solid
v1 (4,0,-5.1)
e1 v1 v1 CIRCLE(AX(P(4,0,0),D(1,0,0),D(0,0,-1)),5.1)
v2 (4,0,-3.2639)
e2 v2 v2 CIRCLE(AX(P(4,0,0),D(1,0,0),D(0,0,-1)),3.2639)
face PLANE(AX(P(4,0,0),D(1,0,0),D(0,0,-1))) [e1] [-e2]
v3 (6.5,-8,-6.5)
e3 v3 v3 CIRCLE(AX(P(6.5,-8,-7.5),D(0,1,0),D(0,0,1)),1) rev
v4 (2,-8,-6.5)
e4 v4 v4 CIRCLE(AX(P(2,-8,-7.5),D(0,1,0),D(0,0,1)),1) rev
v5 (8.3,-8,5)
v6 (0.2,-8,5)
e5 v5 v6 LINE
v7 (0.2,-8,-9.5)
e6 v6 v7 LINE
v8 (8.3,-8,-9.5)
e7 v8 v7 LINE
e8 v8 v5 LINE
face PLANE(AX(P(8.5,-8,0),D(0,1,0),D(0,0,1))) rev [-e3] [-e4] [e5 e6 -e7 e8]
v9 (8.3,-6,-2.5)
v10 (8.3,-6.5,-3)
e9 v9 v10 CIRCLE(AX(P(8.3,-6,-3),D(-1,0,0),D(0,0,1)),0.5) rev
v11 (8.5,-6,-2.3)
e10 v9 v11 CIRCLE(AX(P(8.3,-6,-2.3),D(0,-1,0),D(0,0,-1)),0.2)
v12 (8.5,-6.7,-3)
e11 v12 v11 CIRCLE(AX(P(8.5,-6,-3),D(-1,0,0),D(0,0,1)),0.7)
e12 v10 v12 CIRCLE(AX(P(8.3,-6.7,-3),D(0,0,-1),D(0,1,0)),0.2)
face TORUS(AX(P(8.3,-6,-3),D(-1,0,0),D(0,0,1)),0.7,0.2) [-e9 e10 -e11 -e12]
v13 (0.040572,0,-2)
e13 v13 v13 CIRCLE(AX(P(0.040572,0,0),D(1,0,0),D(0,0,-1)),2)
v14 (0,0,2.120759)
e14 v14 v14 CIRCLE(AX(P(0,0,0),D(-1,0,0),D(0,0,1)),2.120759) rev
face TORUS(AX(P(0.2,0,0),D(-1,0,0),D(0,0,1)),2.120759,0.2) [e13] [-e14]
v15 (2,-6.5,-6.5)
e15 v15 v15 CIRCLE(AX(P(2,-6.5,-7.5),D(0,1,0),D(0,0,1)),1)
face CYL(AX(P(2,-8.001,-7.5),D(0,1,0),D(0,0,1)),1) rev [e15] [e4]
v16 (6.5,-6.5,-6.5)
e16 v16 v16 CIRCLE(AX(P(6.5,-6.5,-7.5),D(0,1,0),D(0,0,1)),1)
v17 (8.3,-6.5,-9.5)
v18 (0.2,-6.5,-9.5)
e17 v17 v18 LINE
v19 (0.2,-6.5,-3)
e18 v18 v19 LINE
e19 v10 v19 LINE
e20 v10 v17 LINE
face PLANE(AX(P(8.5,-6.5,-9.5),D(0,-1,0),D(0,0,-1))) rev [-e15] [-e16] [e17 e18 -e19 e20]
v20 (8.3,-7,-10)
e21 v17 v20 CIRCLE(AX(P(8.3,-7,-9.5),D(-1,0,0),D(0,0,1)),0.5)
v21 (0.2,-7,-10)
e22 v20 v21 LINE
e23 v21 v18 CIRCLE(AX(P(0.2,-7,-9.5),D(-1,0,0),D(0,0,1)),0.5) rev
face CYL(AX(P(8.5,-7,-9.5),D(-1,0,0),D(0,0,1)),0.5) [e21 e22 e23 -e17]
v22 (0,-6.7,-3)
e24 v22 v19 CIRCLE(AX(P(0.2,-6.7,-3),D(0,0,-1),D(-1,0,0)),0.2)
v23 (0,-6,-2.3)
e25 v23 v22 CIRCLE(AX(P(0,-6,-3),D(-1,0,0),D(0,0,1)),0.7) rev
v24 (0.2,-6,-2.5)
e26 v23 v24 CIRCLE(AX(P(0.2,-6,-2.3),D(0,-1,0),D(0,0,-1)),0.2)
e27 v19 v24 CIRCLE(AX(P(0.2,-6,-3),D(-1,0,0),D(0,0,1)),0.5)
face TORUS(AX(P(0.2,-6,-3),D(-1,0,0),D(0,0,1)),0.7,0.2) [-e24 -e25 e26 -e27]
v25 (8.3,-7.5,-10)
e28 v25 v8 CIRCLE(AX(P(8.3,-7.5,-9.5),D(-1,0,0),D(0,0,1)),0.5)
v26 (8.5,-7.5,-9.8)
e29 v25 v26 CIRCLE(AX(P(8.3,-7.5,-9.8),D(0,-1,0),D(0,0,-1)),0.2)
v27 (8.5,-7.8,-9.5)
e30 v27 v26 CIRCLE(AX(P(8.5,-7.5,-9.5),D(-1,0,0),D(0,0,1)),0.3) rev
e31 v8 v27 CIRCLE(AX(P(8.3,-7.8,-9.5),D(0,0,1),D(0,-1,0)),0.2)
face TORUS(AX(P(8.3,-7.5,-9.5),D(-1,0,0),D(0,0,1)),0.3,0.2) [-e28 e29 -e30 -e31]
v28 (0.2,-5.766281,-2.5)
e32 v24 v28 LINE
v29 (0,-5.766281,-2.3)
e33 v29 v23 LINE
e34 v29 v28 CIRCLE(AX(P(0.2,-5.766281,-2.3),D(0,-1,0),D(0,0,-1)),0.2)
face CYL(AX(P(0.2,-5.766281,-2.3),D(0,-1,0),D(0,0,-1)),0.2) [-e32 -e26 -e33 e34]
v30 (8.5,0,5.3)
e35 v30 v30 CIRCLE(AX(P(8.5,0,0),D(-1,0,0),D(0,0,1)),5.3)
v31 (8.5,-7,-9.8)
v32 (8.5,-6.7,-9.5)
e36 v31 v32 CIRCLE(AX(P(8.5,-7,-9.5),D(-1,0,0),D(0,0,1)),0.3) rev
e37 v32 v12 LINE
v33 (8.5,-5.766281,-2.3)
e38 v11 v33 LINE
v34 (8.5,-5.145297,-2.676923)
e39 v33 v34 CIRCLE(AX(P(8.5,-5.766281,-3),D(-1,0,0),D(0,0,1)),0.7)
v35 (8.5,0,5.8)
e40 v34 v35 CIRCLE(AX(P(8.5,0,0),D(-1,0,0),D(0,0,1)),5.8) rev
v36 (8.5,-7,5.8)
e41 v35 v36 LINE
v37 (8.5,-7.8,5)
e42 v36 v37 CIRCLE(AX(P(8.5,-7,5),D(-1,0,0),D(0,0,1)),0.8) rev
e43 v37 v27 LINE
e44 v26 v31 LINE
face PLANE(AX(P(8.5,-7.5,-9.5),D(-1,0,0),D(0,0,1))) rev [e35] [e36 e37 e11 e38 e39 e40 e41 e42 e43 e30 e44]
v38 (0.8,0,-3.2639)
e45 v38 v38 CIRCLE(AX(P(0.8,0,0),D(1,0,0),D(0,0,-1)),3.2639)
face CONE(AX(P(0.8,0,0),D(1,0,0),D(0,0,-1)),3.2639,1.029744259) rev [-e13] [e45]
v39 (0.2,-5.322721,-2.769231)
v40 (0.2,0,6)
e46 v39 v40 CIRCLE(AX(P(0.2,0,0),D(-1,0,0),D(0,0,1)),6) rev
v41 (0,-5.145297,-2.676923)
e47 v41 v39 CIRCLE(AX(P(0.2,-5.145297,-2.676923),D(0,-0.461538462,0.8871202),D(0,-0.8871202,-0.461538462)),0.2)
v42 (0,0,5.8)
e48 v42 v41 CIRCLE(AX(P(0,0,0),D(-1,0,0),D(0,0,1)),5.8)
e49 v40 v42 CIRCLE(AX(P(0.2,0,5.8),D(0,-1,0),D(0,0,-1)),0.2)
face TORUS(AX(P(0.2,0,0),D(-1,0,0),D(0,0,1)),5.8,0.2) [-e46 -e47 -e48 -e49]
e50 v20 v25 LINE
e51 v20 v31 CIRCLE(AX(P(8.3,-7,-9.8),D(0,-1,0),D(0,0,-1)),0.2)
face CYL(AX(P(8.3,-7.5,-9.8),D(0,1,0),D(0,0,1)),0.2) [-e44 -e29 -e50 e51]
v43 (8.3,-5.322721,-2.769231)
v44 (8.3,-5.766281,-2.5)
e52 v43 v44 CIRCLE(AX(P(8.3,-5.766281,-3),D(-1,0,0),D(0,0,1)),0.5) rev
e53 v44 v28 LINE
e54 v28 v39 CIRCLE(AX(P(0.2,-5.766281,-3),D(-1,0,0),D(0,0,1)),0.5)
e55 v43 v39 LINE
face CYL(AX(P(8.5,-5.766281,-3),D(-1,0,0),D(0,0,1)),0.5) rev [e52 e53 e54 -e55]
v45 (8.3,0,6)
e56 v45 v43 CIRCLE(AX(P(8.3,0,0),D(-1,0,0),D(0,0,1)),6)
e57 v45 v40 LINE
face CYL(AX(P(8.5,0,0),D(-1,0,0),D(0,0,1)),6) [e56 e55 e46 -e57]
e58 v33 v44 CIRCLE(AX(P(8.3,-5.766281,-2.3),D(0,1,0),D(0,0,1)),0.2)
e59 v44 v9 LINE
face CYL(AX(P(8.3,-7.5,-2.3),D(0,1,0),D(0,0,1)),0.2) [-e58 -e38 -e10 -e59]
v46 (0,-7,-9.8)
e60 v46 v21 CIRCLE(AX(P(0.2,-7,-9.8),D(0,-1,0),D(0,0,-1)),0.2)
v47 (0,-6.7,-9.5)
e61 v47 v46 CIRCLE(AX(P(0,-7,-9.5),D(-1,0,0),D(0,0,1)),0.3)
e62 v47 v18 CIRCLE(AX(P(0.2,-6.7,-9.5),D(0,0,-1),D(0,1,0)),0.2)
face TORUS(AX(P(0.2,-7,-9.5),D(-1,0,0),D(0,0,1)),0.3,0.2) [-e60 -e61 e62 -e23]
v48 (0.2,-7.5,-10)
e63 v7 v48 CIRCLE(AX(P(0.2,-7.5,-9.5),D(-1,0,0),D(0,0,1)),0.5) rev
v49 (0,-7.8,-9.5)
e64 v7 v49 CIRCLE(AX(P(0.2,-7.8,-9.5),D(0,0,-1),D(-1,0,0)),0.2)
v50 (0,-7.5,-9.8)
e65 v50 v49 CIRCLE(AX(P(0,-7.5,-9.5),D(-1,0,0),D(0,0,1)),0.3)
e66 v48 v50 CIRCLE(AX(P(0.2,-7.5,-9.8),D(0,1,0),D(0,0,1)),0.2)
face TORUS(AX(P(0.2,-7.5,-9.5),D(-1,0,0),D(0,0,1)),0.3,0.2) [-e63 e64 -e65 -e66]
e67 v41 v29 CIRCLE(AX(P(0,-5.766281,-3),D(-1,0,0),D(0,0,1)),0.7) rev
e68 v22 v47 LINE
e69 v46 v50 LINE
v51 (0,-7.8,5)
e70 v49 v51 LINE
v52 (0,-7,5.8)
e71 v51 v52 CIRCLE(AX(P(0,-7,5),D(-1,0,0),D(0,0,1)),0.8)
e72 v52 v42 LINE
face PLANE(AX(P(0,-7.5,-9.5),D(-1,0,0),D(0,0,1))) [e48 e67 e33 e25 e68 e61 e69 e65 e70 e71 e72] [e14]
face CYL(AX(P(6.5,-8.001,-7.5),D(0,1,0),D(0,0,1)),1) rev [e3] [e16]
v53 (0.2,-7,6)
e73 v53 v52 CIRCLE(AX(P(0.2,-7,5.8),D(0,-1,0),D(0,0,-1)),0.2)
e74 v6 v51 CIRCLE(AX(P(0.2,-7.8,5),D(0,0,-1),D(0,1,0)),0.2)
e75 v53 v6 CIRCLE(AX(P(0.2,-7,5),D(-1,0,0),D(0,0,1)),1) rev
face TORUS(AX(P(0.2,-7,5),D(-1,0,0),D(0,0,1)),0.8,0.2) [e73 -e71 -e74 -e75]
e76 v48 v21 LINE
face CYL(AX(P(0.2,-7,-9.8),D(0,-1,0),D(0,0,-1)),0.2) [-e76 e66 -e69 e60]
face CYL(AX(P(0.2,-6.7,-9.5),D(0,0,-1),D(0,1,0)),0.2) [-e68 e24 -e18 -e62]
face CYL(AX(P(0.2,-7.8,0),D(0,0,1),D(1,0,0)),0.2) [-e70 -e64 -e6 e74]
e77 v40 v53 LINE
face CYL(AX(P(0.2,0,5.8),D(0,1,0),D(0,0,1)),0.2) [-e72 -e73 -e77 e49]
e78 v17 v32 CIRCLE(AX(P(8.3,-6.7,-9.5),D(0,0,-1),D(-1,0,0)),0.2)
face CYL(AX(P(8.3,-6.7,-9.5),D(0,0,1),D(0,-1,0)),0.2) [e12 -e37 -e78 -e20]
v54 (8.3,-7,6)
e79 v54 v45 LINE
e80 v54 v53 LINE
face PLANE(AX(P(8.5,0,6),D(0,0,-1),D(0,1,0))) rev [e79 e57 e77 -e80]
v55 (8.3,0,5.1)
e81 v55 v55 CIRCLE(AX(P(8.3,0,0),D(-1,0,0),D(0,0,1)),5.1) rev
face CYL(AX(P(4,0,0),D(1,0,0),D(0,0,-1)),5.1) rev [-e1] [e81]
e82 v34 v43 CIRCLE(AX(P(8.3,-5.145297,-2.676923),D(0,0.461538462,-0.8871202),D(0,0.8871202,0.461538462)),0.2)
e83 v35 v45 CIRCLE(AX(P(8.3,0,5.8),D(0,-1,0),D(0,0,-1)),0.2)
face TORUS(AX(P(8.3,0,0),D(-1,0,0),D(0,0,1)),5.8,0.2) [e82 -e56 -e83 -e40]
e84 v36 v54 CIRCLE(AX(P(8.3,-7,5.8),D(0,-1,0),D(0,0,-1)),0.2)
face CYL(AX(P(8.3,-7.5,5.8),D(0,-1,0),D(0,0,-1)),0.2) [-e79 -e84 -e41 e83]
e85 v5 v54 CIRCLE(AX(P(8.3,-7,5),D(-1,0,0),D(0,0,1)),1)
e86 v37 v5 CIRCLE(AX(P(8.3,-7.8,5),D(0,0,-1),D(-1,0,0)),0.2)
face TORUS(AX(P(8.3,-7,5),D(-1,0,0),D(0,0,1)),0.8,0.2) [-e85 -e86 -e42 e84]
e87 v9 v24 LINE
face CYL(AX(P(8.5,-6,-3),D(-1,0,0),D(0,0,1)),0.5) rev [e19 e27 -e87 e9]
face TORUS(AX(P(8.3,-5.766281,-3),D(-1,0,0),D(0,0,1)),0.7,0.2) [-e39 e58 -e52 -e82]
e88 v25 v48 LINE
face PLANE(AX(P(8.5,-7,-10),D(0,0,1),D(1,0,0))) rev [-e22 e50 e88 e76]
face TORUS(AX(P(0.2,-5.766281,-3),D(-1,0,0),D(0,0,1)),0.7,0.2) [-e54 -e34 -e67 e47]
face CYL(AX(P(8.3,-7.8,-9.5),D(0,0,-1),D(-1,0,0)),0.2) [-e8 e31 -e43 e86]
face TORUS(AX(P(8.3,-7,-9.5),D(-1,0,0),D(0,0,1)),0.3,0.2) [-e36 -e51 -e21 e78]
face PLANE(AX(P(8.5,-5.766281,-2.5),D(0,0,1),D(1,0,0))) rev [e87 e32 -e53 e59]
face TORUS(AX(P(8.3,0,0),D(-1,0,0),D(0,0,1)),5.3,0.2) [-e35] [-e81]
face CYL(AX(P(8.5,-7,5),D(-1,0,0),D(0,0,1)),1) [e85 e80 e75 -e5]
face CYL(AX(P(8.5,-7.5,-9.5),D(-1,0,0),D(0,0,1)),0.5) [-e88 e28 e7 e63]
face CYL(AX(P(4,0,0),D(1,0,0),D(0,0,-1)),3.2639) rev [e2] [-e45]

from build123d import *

# Parameters (mm, degrees)
EXTRUDE_1_DEPTH             = 8.5
SKETCH_2_R                  = 2
CUT_EXTRUDE_1_DEPTH         = 10
SKETCH_6_R                  = 5.1
CUT_EXTRUDE_3_DEPTH         = 4.5
HOLE_WIZARD_5_16_18_1_D     = 6.5278
HOLE_WIZARD_5_16_18_1_DEPTH = 3.2
HOLE_WIZARD_5_16_18_1_TIP   = 1.961148974
CUT_EXTRUDE_2_REACH         = 20.125
SKETCH_5_R                  = 1
FILLET_1_R                  = 0.2


with BuildPart() as part:
    # 草图1 → 凸台-拉伸1 (new body)
    with BuildSketch(Plane(origin=(0, 0, 0), x_dir=(0, 0, -1), z_dir=(1, 0, 0))):
        with BuildLine():
            Line((0, -8), (9.5, -8))
            ThreePointArc((9.5, -8), (9.853553391, -7.853553391), (10, -7.5))
            Line((10, -7.5), (10, -7))
            ThreePointArc((10, -7), (9.853553391, -6.646446609), (9.5, -6.5))
            Line((9.5, -6.5), (3, -6.5))
            ThreePointArc((3, -6.5), (2.646446609, -6.353553391), (2.5, -6))
            Line((2.5, -6), (2.5, -5.766281297))
            ThreePointArc((2.5, -5.766281297), (2.572574793, -5.506844037), (2.769230769, -5.322721198))
            ThreePointArc((2.769230769, -5.322721198), (3.11324713, 5.129102486), (-6, 0))
            Line((-6, 0), (-6, -7))
            ThreePointArc((-6, -7), (-5.707106781, -7.707106781), (-5, -8))
            Line((-5, -8), (0, -8))
        make_face()
    extrude(amount=EXTRUDE_1_DEPTH)

    # 草图2 → 切除-拉伸1 (cut)
    with BuildSketch(Plane.ZY):
        Circle(SKETCH_2_R)
    extrude(amount=-CUT_EXTRUDE_1_DEPTH, mode=Mode.SUBTRACT)

    # 草图6 → 切除-拉伸3 (cut)
    with BuildSketch(Plane(origin=(8.5, 0, 0), x_dir=(0, 0, -1), z_dir=(1, 0, 0))):
        Circle(SKETCH_6_R)
    extrude(amount=-CUT_EXTRUDE_3_DEPTH, mode=Mode.SUBTRACT)

    # 5/16-18 螺纹孔1
    with Locations(Plane(origin=(4, 0, 0), x_dir=(0, 0, -1), z_dir=(1, 0, 0))):
        with Locations((0, 0)):
            Hole(HOLE_WIZARD_5_16_18_1_D / 2, depth=HOLE_WIZARD_5_16_18_1_DEPTH)
            with Locations((0, 0, -(HOLE_WIZARD_5_16_18_1_DEPTH + HOLE_WIZARD_5_16_18_1_TIP / 2))):  # 118° drill point
                Cone(0, HOLE_WIZARD_5_16_18_1_D / 2, HOLE_WIZARD_5_16_18_1_TIP, mode=Mode.SUBTRACT)

    # 草图5 → 切除-拉伸2 (cut, up to next)
    with BuildSketch(Plane(origin=(0, -6.5, 0), x_dir=(1, 0, 0), z_dir=(0, 1, 0)), mode=Mode.PRIVATE) as cut_extrude_2_sk1:
        with Locations(Location((2, 7.5, 0), (0, 0, 270))):
            Circle(SKETCH_5_R)
    cut_extrude_2_tool1 = extrude(cut_extrude_2_sk1.sketch, amount=-CUT_EXTRUDE_2_REACH, mode=Mode.PRIVATE) & part.part
    # 草图5 → 切除-拉伸2 (cut, up to next)
    with BuildSketch(Plane(origin=(0, -6.5, 0), x_dir=(1, 0, 0), z_dir=(0, 1, 0)), mode=Mode.PRIVATE) as cut_extrude_2_sk2:
        with Locations(Location((6.5, 7.5, 0), (0, 0, 270))):
            Circle(SKETCH_5_R)
    cut_extrude_2_tool2 = extrude(cut_extrude_2_sk2.sketch, amount=-CUT_EXTRUDE_2_REACH, mode=Mode.PRIVATE) & part.part
    add(cut_extrude_2_tool1.solids().sort_by_distance((2, -6.5, -7.5))[0], mode=Mode.SUBTRACT)
    add(cut_extrude_2_tool2.solids().sort_by_distance((6.5, -6.5, -7.5))[0], mode=Mode.SUBTRACT)

    # 圆角1
    # the kernel refuses this fillet: 0.2 mm, written as the material it takes off along each edge
    with BuildSketch(Plane(origin=(8.5, -7, -9.5), x_dir=(0, 0, -1), z_dir=(0, -1, 0))) as fillet_1_piece_1:
        with BuildLine():
            CenterArc((0.5 - FILLET_1_R, -FILLET_1_R), FILLET_1_R, 0, 90)
            Line((0.5, -FILLET_1_R), (0.5 + FILLET_1_R * 0.02, -FILLET_1_R))
            Line((0.5 + FILLET_1_R * 0.02, -FILLET_1_R), (0.5 + FILLET_1_R * 0.02, FILLET_1_R * 0.02))
            Line((0.5 + FILLET_1_R * 0.02, FILLET_1_R * 0.02), (0.5 - FILLET_1_R, FILLET_1_R * 0.02))
            Line((0.5 - FILLET_1_R, FILLET_1_R * 0.02), (0.5 - FILLET_1_R, 0))
        make_face()
    revolve(axis=Axis((8.5, -7, -9.5), (1, 0, 0)), revolution_arc=90, mode=Mode.SUBTRACT)
    with BuildSketch(Plane(origin=(0, -8, 5), x_dir=(0, 1, 0), z_dir=(0, 0, -1)), Plane(origin=(8.5, -8, -9.5), x_dir=(0, 1, 0), z_dir=(0, 0, 1))) as fillet_1_piece_2:
        with BuildLine():
            CenterArc((FILLET_1_R, FILLET_1_R), FILLET_1_R, 180, 90)
            Line((0, FILLET_1_R), (-FILLET_1_R * 0.02, FILLET_1_R))
            Line((-FILLET_1_R * 0.02, FILLET_1_R), (-FILLET_1_R * 0.02, -FILLET_1_R * 0.02))
            Line((-FILLET_1_R * 0.02, -FILLET_1_R * 0.02), (FILLET_1_R, -FILLET_1_R * 0.02))
            Line((FILLET_1_R, -FILLET_1_R * 0.02), (FILLET_1_R, 0))
        make_face()
    extrude(amount=14.5, mode=Mode.SUBTRACT)
    with BuildSketch(Plane(origin=(0, -7, 5), x_dir=(0, 0, 1), z_dir=(0, 1, 0))) as fillet_1_piece_3:
        with BuildLine():
            CenterArc((1 - FILLET_1_R, FILLET_1_R), FILLET_1_R, 270, 90)
            Line((1 - FILLET_1_R, 0), (1 - FILLET_1_R, -FILLET_1_R * 0.02))
            Line((1 - FILLET_1_R, -FILLET_1_R * 0.02), (1 + FILLET_1_R * 0.02, -FILLET_1_R * 0.02))
            Line((1 + FILLET_1_R * 0.02, -FILLET_1_R * 0.02), (1 + FILLET_1_R * 0.02, FILLET_1_R))
            Line((1 + FILLET_1_R * 0.02, FILLET_1_R), (1, FILLET_1_R))
        make_face()
    revolve(axis=Axis((0, -7, 5), (1, 0, 0)), revolution_arc=90, mode=Mode.SUBTRACT)
    with BuildSketch(Plane(origin=(0, 0, 6), x_dir=(1, 0, 0), z_dir=(0, -1, 0))) as fillet_1_piece_4:
        with BuildLine():
            CenterArc((FILLET_1_R, -FILLET_1_R), FILLET_1_R, 90, 90)
            Line((0, -FILLET_1_R), (-FILLET_1_R * 0.02, -FILLET_1_R))
            Line((-FILLET_1_R * 0.02, -FILLET_1_R), (-FILLET_1_R * 0.02, FILLET_1_R * 0.02))
            Line((-FILLET_1_R * 0.02, FILLET_1_R * 0.02), (FILLET_1_R, FILLET_1_R * 0.02))
            Line((FILLET_1_R, FILLET_1_R * 0.02), (FILLET_1_R, 0))
        make_face()
    extrude(amount=7, mode=Mode.SUBTRACT)
    with BuildSketch(Plane(origin=(0, 0, 0), x_dir=(0, -0.8871201995900613, -0.46153846153846145), z_dir=(0, -0.46153846153846145, 0.8871201995900613))) as fillet_1_piece_5:
        with BuildLine():
            CenterArc((6 - FILLET_1_R, FILLET_1_R), FILLET_1_R, 270, 90)
            Line((6 - FILLET_1_R, 0), (6 - FILLET_1_R, -FILLET_1_R * 0.02))
            Line((6 - FILLET_1_R, -FILLET_1_R * 0.02), (6 + FILLET_1_R * 0.02, -FILLET_1_R * 0.02))
            Line((6 + FILLET_1_R * 0.02, -FILLET_1_R * 0.02), (6 + FILLET_1_R * 0.02, FILLET_1_R))
            Line((6 + FILLET_1_R * 0.02, FILLET_1_R), (6, FILLET_1_R))
        make_face()
    revolve(axis=Axis((0, 0, 0), (1, 0, 0)), revolution_arc=242.51357375, mode=Mode.SUBTRACT)
    with BuildSketch(Plane(origin=(0, -5.766281297, -3), x_dir=(0, 0, 1), z_dir=(0, -1, 0))) as fillet_1_piece_6:
        with BuildLine():
            CenterArc((0.5 + FILLET_1_R, -FILLET_1_R), FILLET_1_R, 90, 90)
            Line((0.5, -FILLET_1_R), (0.5 - FILLET_1_R * 0.02, -FILLET_1_R))
            Line((0.5 - FILLET_1_R * 0.02, -FILLET_1_R), (0.5 - FILLET_1_R * 0.02, FILLET_1_R * 0.02))
            Line((0.5 - FILLET_1_R * 0.02, FILLET_1_R * 0.02), (0.5 + FILLET_1_R, FILLET_1_R * 0.02))
            Line((0.5 + FILLET_1_R, FILLET_1_R * 0.02), (0.5 + FILLET_1_R, 0))
        make_face()
    revolve(axis=Axis((0, -5.766281297, -3), (-1, 0, 0)), revolution_arc=62.51357375, mode=Mode.SUBTRACT)
    with BuildSketch(Plane(origin=(8.5, -6.5, -9.5), x_dir=(0, -1, 0), z_dir=(0, 0, 1))) as fillet_1_piece_7:
        with BuildLine():
            CenterArc((FILLET_1_R, -FILLET_1_R), FILLET_1_R, 90, 90)
            Line((0, -FILLET_1_R), (-FILLET_1_R * 0.02, -FILLET_1_R))
            Line((-FILLET_1_R * 0.02, -FILLET_1_R), (-FILLET_1_R * 0.02, FILLET_1_R * 0.02))
            Line((-FILLET_1_R * 0.02, FILLET_1_R * 0.02), (FILLET_1_R, FILLET_1_R * 0.02))
            Line((FILLET_1_R, FILLET_1_R * 0.02), (FILLET_1_R, 0))
        make_face()
    extrude(amount=6.5, mode=Mode.SUBTRACT)
    with BuildSketch(Plane(origin=(0, -6, -2.5), x_dir=(0, 0, 1), z_dir=(0, 1, 0))) as fillet_1_piece_8:
        with BuildLine():
            CenterArc((FILLET_1_R, FILLET_1_R), FILLET_1_R, 180, 90)
            Line((0, FILLET_1_R), (-FILLET_1_R * 0.02, FILLET_1_R))
            Line((-FILLET_1_R * 0.02, FILLET_1_R), (-FILLET_1_R * 0.02, -FILLET_1_R * 0.02))
            Line((-FILLET_1_R * 0.02, -FILLET_1_R * 0.02), (FILLET_1_R, -FILLET_1_R * 0.02))
            Line((FILLET_1_R, -FILLET_1_R * 0.02), (FILLET_1_R, 0))
        make_face()
    extrude(amount=0.233718703, mode=Mode.SUBTRACT)
    with BuildSketch(Plane(origin=(0, -6, -3), x_dir=(0, -1, 0), z_dir=(0, 0, -1))) as fillet_1_piece_9:
        with BuildLine():
            CenterArc((0.5 + FILLET_1_R, -FILLET_1_R), FILLET_1_R, 90, 90)
            Line((0.5, -FILLET_1_R), (0.5 - FILLET_1_R * 0.02, -FILLET_1_R))
            Line((0.5 - FILLET_1_R * 0.02, -FILLET_1_R), (0.5 - FILLET_1_R * 0.02, FILLET_1_R * 0.02))
            Line((0.5 - FILLET_1_R * 0.02, FILLET_1_R * 0.02), (0.5 + FILLET_1_R, FILLET_1_R * 0.02))
            Line((0.5 + FILLET_1_R, FILLET_1_R * 0.02), (0.5 + FILLET_1_R, 0))
        make_face()
    revolve(axis=Axis((0, -6, -3), (-1, 0, 0)), revolution_arc=90, mode=Mode.SUBTRACT)
    with BuildSketch(Plane(origin=(0, -6.5, -9.5), x_dir=(0, -1, 0), z_dir=(0, 0, 1))) as fillet_1_piece_10:
        with BuildLine():
            CenterArc((FILLET_1_R, FILLET_1_R), FILLET_1_R, 180, 90)
            Line((0, FILLET_1_R), (-FILLET_1_R * 0.02, FILLET_1_R))
            Line((-FILLET_1_R * 0.02, FILLET_1_R), (-FILLET_1_R * 0.02, -FILLET_1_R * 0.02))
            Line((-FILLET_1_R * 0.02, -FILLET_1_R * 0.02), (FILLET_1_R, -FILLET_1_R * 0.02))
            Line((FILLET_1_R, -FILLET_1_R * 0.02), (FILLET_1_R, 0))
        make_face()
    extrude(amount=6.5, mode=Mode.SUBTRACT)
    with BuildSketch(Plane(origin=(0, -7, -9.5), x_dir=(0, 0, -1), z_dir=(0, -1, 0))) as fillet_1_piece_11:
        with BuildLine():
            CenterArc((0.5 - FILLET_1_R, FILLET_1_R), FILLET_1_R, 270, 90)
            Line((0.5, FILLET_1_R), (0.5 + FILLET_1_R * 0.02, FILLET_1_R))
            Line((0.5 + FILLET_1_R * 0.02, FILLET_1_R), (0.5 + FILLET_1_R * 0.02, -FILLET_1_R * 0.02))
            Line((0.5 + FILLET_1_R * 0.02, -FILLET_1_R * 0.02), (0.5 - FILLET_1_R, -FILLET_1_R * 0.02))
            Line((0.5 - FILLET_1_R, -FILLET_1_R * 0.02), (0.5 - FILLET_1_R, 0))
        make_face()
    revolve(axis=Axis((0, -7, -9.5), (1, 0, 0)), revolution_arc=90, mode=Mode.SUBTRACT)
    with BuildSketch(Plane(origin=(0, -7.5, -10), x_dir=(0, 0, 1), z_dir=(0, 1, 0))) as fillet_1_piece_12:
        with BuildLine():
            CenterArc((FILLET_1_R, FILLET_1_R), FILLET_1_R, 180, 90)
            Line((0, FILLET_1_R), (-FILLET_1_R * 0.02, FILLET_1_R))
            Line((-FILLET_1_R * 0.02, FILLET_1_R), (-FILLET_1_R * 0.02, -FILLET_1_R * 0.02))
            Line((-FILLET_1_R * 0.02, -FILLET_1_R * 0.02), (FILLET_1_R, -FILLET_1_R * 0.02))
            Line((FILLET_1_R, -FILLET_1_R * 0.02), (FILLET_1_R, 0))
        make_face()
    extrude(amount=0.5, mode=Mode.SUBTRACT)
    with BuildSketch(Plane(origin=(0, -7.5, -9.5), x_dir=(0, -1, 0), z_dir=(0, 0, 1))) as fillet_1_piece_13:
        with BuildLine():
            CenterArc((0.5 - FILLET_1_R, FILLET_1_R), FILLET_1_R, 270, 90)
            Line((0.5, FILLET_1_R), (0.5 + FILLET_1_R * 0.02, FILLET_1_R))
            Line((0.5 + FILLET_1_R * 0.02, FILLET_1_R), (0.5 + FILLET_1_R * 0.02, -FILLET_1_R * 0.02))
            Line((0.5 + FILLET_1_R * 0.02, -FILLET_1_R * 0.02), (0.5 - FILLET_1_R, -FILLET_1_R * 0.02))
            Line((0.5 - FILLET_1_R, -FILLET_1_R * 0.02), (0.5 - FILLET_1_R, 0))
        make_face()
    revolve(axis=Axis((0, -7.5, -9.5), (1, 0, 0)), revolution_arc=90, mode=Mode.SUBTRACT)
    with BuildSketch(Plane(origin=(8.5, -6, -3), x_dir=(0, -1, 0), z_dir=(0, 0, -1))) as fillet_1_piece_14:
        with BuildLine():
            CenterArc((0.5 + FILLET_1_R, FILLET_1_R), FILLET_1_R, 180, 90)
            Line((0.5, FILLET_1_R), (0.5 - FILLET_1_R * 0.02, FILLET_1_R))
            Line((0.5 - FILLET_1_R * 0.02, FILLET_1_R), (0.5 - FILLET_1_R * 0.02, -FILLET_1_R * 0.02))
            Line((0.5 - FILLET_1_R * 0.02, -FILLET_1_R * 0.02), (0.5 + FILLET_1_R, -FILLET_1_R * 0.02))
            Line((0.5 + FILLET_1_R, -FILLET_1_R * 0.02), (0.5 + FILLET_1_R, 0))
        make_face()
    revolve(axis=Axis((8.5, -6, -3), (-1, 0, 0)), revolution_arc=90, mode=Mode.SUBTRACT)
    with BuildSketch(Plane(origin=(8.5, -6, -2.5), x_dir=(0, 0, 1), z_dir=(0, 1, 0))) as fillet_1_piece_15:
        with BuildLine():
            CenterArc((FILLET_1_R, -FILLET_1_R), FILLET_1_R, 90, 90)
            Line((0, -FILLET_1_R), (-FILLET_1_R * 0.02, -FILLET_1_R))
            Line((-FILLET_1_R * 0.02, -FILLET_1_R), (-FILLET_1_R * 0.02, FILLET_1_R * 0.02))
            Line((-FILLET_1_R * 0.02, FILLET_1_R * 0.02), (FILLET_1_R, FILLET_1_R * 0.02))
            Line((FILLET_1_R, FILLET_1_R * 0.02), (FILLET_1_R, 0))
        make_face()
    extrude(amount=0.233718703, mode=Mode.SUBTRACT)
    with BuildSketch(Plane(origin=(8.5, -5.766281297, -3), x_dir=(0, 0, 1), z_dir=(0, -1, 0))) as fillet_1_piece_16:
        with BuildLine():
            CenterArc((0.5 + FILLET_1_R, FILLET_1_R), FILLET_1_R, 180, 90)
            Line((0.5, FILLET_1_R), (0.5 - FILLET_1_R * 0.02, FILLET_1_R))
            Line((0.5 - FILLET_1_R * 0.02, FILLET_1_R), (0.5 - FILLET_1_R * 0.02, -FILLET_1_R * 0.02))
            Line((0.5 - FILLET_1_R * 0.02, -FILLET_1_R * 0.02), (0.5 + FILLET_1_R, -FILLET_1_R * 0.02))
            Line((0.5 + FILLET_1_R, -FILLET_1_R * 0.02), (0.5 + FILLET_1_R, 0))
        make_face()
    revolve(axis=Axis((8.5, -5.766281297, -3), (-1, 0, 0)), revolution_arc=62.51357375, mode=Mode.SUBTRACT)
    with BuildSketch(Plane(origin=(8.5, 0, 0), x_dir=(0, -0.8871201995900613, -0.46153846153846145), z_dir=(0, -0.46153846153846145, 0.8871201995900613))) as fillet_1_piece_17:
        with BuildLine():
            CenterArc((6 - FILLET_1_R, -FILLET_1_R), FILLET_1_R, 0, 90)
            Line((6 - FILLET_1_R, 0), (6 - FILLET_1_R, FILLET_1_R * 0.02))
            Line((6 - FILLET_1_R, FILLET_1_R * 0.02), (6 + FILLET_1_R * 0.02, FILLET_1_R * 0.02))
            Line((6 + FILLET_1_R * 0.02, FILLET_1_R * 0.02), (6 + FILLET_1_R * 0.02, -FILLET_1_R))
            Line((6 + FILLET_1_R * 0.02, -FILLET_1_R), (6, -FILLET_1_R))
        make_face()
    revolve(axis=Axis((8.5, 0, 0), (1, 0, 0)), revolution_arc=242.51357375, mode=Mode.SUBTRACT)
    with BuildSketch(Plane(origin=(8.5, 0, 6), x_dir=(-1, 0, 0), z_dir=(0, -1, 0))) as fillet_1_piece_18:
        with BuildLine():
            CenterArc((FILLET_1_R, FILLET_1_R), FILLET_1_R, 180, 90)
            Line((0, FILLET_1_R), (-FILLET_1_R * 0.02, FILLET_1_R))
            Line((-FILLET_1_R * 0.02, FILLET_1_R), (-FILLET_1_R * 0.02, -FILLET_1_R * 0.02))
            Line((-FILLET_1_R * 0.02, -FILLET_1_R * 0.02), (FILLET_1_R, -FILLET_1_R * 0.02))
            Line((FILLET_1_R, -FILLET_1_R * 0.02), (FILLET_1_R, 0))
        make_face()
    extrude(amount=7, mode=Mode.SUBTRACT)
    with BuildSketch(Plane(origin=(8.5, -7, 5), x_dir=(0, 0, 1), z_dir=(0, 1, 0))) as fillet_1_piece_19:
        with BuildLine():
            CenterArc((1 - FILLET_1_R, -FILLET_1_R), FILLET_1_R, 0, 90)
            Line((1 - FILLET_1_R, 0), (1 - FILLET_1_R, FILLET_1_R * 0.02))
            Line((1 - FILLET_1_R, FILLET_1_R * 0.02), (1 + FILLET_1_R * 0.02, FILLET_1_R * 0.02))
            Line((1 + FILLET_1_R * 0.02, FILLET_1_R * 0.02), (1 + FILLET_1_R * 0.02, -FILLET_1_R))
            Line((1 + FILLET_1_R * 0.02, -FILLET_1_R), (1, -FILLET_1_R))
        make_face()
    revolve(axis=Axis((8.5, -7, 5), (1, 0, 0)), revolution_arc=90, mode=Mode.SUBTRACT)
    with BuildSketch(Plane(origin=(0, 0, 0), x_dir=(0, 0, 1), z_dir=(0, -1, 0))) as fillet_1_piece_20:
        with BuildLine():
            CenterArc((2.120759252, -0.2), FILLET_1_R, 90, 37.142271212)
            Line((2, -0.040572264), (1.997584815, -0.037383709))
            ThreePointArc((1.997584815, -0.037383709), (1.996, -0.020286132), (1.996, 0))
            Line((1.996, 0), (2, 0.004))
            Line((2, 0.004), (2.120759252, 0.004))
            Line((2.120759252, 0.004), (2.120759252, 0))
        make_face()
    revolve(axis=Axis((0, 0, 0), (-1, 0, 0)), mode=Mode.SUBTRACT)
    with BuildSketch(Plane(origin=(8.5, -7.5, -9.5), x_dir=(0, -1, 0), z_dir=(0, 0, 1))) as fillet_1_piece_21:
        with BuildLine():
            CenterArc((0.5 - FILLET_1_R, -FILLET_1_R), FILLET_1_R, 0, 90)
            Line((0.5, -FILLET_1_R), (0.5 + FILLET_1_R * 0.02, -FILLET_1_R))
            Line((0.5 + FILLET_1_R * 0.02, -FILLET_1_R), (0.5 + FILLET_1_R * 0.02, FILLET_1_R * 0.02))
            Line((0.5 + FILLET_1_R * 0.02, FILLET_1_R * 0.02), (0.5 - FILLET_1_R, FILLET_1_R * 0.02))
            Line((0.5 - FILLET_1_R, FILLET_1_R * 0.02), (0.5 - FILLET_1_R, 0))
        make_face()
    revolve(axis=Axis((8.5, -7.5, -9.5), (1, 0, 0)), revolution_arc=90, mode=Mode.SUBTRACT)
    with BuildSketch(Plane(origin=(8.5, 0, 0), x_dir=(0, 0, -1), z_dir=(0, -1, 0))) as fillet_1_piece_22:
        with BuildLine():
            CenterArc((5.1 + FILLET_1_R, -FILLET_1_R), FILLET_1_R, 90, 90)
            Line((5.1, -FILLET_1_R), (5.1 - FILLET_1_R * 0.02, -FILLET_1_R))
            Line((5.1 - FILLET_1_R * 0.02, -FILLET_1_R), (5.1 - FILLET_1_R * 0.02, FILLET_1_R * 0.02))
            Line((5.1 - FILLET_1_R * 0.02, FILLET_1_R * 0.02), (5.1 + FILLET_1_R, FILLET_1_R * 0.02))
            Line((5.1 + FILLET_1_R, FILLET_1_R * 0.02), (5.1 + FILLET_1_R, 0))
        make_face()
    revolve(axis=Axis((8.5, 0, 0), (1, 0, 0)), mode=Mode.SUBTRACT)
    with BuildSketch(Plane(origin=(8.5, -7.5, -10), x_dir=(0, 0, 1), z_dir=(0, 1, 0))) as fillet_1_piece_23:
        with BuildLine():
            CenterArc((FILLET_1_R, -FILLET_1_R), FILLET_1_R, 90, 90)
            Line((0, -FILLET_1_R), (-FILLET_1_R * 0.02, -FILLET_1_R))
            Line((-FILLET_1_R * 0.02, -FILLET_1_R), (-FILLET_1_R * 0.02, FILLET_1_R * 0.02))
            Line((-FILLET_1_R * 0.02, FILLET_1_R * 0.02), (FILLET_1_R, FILLET_1_R * 0.02))
            Line((FILLET_1_R, FILLET_1_R * 0.02), (FILLET_1_R, 0))
        make_face()
    extrude(amount=0.5, mode=Mode.SUBTRACT)


solid = part.part
